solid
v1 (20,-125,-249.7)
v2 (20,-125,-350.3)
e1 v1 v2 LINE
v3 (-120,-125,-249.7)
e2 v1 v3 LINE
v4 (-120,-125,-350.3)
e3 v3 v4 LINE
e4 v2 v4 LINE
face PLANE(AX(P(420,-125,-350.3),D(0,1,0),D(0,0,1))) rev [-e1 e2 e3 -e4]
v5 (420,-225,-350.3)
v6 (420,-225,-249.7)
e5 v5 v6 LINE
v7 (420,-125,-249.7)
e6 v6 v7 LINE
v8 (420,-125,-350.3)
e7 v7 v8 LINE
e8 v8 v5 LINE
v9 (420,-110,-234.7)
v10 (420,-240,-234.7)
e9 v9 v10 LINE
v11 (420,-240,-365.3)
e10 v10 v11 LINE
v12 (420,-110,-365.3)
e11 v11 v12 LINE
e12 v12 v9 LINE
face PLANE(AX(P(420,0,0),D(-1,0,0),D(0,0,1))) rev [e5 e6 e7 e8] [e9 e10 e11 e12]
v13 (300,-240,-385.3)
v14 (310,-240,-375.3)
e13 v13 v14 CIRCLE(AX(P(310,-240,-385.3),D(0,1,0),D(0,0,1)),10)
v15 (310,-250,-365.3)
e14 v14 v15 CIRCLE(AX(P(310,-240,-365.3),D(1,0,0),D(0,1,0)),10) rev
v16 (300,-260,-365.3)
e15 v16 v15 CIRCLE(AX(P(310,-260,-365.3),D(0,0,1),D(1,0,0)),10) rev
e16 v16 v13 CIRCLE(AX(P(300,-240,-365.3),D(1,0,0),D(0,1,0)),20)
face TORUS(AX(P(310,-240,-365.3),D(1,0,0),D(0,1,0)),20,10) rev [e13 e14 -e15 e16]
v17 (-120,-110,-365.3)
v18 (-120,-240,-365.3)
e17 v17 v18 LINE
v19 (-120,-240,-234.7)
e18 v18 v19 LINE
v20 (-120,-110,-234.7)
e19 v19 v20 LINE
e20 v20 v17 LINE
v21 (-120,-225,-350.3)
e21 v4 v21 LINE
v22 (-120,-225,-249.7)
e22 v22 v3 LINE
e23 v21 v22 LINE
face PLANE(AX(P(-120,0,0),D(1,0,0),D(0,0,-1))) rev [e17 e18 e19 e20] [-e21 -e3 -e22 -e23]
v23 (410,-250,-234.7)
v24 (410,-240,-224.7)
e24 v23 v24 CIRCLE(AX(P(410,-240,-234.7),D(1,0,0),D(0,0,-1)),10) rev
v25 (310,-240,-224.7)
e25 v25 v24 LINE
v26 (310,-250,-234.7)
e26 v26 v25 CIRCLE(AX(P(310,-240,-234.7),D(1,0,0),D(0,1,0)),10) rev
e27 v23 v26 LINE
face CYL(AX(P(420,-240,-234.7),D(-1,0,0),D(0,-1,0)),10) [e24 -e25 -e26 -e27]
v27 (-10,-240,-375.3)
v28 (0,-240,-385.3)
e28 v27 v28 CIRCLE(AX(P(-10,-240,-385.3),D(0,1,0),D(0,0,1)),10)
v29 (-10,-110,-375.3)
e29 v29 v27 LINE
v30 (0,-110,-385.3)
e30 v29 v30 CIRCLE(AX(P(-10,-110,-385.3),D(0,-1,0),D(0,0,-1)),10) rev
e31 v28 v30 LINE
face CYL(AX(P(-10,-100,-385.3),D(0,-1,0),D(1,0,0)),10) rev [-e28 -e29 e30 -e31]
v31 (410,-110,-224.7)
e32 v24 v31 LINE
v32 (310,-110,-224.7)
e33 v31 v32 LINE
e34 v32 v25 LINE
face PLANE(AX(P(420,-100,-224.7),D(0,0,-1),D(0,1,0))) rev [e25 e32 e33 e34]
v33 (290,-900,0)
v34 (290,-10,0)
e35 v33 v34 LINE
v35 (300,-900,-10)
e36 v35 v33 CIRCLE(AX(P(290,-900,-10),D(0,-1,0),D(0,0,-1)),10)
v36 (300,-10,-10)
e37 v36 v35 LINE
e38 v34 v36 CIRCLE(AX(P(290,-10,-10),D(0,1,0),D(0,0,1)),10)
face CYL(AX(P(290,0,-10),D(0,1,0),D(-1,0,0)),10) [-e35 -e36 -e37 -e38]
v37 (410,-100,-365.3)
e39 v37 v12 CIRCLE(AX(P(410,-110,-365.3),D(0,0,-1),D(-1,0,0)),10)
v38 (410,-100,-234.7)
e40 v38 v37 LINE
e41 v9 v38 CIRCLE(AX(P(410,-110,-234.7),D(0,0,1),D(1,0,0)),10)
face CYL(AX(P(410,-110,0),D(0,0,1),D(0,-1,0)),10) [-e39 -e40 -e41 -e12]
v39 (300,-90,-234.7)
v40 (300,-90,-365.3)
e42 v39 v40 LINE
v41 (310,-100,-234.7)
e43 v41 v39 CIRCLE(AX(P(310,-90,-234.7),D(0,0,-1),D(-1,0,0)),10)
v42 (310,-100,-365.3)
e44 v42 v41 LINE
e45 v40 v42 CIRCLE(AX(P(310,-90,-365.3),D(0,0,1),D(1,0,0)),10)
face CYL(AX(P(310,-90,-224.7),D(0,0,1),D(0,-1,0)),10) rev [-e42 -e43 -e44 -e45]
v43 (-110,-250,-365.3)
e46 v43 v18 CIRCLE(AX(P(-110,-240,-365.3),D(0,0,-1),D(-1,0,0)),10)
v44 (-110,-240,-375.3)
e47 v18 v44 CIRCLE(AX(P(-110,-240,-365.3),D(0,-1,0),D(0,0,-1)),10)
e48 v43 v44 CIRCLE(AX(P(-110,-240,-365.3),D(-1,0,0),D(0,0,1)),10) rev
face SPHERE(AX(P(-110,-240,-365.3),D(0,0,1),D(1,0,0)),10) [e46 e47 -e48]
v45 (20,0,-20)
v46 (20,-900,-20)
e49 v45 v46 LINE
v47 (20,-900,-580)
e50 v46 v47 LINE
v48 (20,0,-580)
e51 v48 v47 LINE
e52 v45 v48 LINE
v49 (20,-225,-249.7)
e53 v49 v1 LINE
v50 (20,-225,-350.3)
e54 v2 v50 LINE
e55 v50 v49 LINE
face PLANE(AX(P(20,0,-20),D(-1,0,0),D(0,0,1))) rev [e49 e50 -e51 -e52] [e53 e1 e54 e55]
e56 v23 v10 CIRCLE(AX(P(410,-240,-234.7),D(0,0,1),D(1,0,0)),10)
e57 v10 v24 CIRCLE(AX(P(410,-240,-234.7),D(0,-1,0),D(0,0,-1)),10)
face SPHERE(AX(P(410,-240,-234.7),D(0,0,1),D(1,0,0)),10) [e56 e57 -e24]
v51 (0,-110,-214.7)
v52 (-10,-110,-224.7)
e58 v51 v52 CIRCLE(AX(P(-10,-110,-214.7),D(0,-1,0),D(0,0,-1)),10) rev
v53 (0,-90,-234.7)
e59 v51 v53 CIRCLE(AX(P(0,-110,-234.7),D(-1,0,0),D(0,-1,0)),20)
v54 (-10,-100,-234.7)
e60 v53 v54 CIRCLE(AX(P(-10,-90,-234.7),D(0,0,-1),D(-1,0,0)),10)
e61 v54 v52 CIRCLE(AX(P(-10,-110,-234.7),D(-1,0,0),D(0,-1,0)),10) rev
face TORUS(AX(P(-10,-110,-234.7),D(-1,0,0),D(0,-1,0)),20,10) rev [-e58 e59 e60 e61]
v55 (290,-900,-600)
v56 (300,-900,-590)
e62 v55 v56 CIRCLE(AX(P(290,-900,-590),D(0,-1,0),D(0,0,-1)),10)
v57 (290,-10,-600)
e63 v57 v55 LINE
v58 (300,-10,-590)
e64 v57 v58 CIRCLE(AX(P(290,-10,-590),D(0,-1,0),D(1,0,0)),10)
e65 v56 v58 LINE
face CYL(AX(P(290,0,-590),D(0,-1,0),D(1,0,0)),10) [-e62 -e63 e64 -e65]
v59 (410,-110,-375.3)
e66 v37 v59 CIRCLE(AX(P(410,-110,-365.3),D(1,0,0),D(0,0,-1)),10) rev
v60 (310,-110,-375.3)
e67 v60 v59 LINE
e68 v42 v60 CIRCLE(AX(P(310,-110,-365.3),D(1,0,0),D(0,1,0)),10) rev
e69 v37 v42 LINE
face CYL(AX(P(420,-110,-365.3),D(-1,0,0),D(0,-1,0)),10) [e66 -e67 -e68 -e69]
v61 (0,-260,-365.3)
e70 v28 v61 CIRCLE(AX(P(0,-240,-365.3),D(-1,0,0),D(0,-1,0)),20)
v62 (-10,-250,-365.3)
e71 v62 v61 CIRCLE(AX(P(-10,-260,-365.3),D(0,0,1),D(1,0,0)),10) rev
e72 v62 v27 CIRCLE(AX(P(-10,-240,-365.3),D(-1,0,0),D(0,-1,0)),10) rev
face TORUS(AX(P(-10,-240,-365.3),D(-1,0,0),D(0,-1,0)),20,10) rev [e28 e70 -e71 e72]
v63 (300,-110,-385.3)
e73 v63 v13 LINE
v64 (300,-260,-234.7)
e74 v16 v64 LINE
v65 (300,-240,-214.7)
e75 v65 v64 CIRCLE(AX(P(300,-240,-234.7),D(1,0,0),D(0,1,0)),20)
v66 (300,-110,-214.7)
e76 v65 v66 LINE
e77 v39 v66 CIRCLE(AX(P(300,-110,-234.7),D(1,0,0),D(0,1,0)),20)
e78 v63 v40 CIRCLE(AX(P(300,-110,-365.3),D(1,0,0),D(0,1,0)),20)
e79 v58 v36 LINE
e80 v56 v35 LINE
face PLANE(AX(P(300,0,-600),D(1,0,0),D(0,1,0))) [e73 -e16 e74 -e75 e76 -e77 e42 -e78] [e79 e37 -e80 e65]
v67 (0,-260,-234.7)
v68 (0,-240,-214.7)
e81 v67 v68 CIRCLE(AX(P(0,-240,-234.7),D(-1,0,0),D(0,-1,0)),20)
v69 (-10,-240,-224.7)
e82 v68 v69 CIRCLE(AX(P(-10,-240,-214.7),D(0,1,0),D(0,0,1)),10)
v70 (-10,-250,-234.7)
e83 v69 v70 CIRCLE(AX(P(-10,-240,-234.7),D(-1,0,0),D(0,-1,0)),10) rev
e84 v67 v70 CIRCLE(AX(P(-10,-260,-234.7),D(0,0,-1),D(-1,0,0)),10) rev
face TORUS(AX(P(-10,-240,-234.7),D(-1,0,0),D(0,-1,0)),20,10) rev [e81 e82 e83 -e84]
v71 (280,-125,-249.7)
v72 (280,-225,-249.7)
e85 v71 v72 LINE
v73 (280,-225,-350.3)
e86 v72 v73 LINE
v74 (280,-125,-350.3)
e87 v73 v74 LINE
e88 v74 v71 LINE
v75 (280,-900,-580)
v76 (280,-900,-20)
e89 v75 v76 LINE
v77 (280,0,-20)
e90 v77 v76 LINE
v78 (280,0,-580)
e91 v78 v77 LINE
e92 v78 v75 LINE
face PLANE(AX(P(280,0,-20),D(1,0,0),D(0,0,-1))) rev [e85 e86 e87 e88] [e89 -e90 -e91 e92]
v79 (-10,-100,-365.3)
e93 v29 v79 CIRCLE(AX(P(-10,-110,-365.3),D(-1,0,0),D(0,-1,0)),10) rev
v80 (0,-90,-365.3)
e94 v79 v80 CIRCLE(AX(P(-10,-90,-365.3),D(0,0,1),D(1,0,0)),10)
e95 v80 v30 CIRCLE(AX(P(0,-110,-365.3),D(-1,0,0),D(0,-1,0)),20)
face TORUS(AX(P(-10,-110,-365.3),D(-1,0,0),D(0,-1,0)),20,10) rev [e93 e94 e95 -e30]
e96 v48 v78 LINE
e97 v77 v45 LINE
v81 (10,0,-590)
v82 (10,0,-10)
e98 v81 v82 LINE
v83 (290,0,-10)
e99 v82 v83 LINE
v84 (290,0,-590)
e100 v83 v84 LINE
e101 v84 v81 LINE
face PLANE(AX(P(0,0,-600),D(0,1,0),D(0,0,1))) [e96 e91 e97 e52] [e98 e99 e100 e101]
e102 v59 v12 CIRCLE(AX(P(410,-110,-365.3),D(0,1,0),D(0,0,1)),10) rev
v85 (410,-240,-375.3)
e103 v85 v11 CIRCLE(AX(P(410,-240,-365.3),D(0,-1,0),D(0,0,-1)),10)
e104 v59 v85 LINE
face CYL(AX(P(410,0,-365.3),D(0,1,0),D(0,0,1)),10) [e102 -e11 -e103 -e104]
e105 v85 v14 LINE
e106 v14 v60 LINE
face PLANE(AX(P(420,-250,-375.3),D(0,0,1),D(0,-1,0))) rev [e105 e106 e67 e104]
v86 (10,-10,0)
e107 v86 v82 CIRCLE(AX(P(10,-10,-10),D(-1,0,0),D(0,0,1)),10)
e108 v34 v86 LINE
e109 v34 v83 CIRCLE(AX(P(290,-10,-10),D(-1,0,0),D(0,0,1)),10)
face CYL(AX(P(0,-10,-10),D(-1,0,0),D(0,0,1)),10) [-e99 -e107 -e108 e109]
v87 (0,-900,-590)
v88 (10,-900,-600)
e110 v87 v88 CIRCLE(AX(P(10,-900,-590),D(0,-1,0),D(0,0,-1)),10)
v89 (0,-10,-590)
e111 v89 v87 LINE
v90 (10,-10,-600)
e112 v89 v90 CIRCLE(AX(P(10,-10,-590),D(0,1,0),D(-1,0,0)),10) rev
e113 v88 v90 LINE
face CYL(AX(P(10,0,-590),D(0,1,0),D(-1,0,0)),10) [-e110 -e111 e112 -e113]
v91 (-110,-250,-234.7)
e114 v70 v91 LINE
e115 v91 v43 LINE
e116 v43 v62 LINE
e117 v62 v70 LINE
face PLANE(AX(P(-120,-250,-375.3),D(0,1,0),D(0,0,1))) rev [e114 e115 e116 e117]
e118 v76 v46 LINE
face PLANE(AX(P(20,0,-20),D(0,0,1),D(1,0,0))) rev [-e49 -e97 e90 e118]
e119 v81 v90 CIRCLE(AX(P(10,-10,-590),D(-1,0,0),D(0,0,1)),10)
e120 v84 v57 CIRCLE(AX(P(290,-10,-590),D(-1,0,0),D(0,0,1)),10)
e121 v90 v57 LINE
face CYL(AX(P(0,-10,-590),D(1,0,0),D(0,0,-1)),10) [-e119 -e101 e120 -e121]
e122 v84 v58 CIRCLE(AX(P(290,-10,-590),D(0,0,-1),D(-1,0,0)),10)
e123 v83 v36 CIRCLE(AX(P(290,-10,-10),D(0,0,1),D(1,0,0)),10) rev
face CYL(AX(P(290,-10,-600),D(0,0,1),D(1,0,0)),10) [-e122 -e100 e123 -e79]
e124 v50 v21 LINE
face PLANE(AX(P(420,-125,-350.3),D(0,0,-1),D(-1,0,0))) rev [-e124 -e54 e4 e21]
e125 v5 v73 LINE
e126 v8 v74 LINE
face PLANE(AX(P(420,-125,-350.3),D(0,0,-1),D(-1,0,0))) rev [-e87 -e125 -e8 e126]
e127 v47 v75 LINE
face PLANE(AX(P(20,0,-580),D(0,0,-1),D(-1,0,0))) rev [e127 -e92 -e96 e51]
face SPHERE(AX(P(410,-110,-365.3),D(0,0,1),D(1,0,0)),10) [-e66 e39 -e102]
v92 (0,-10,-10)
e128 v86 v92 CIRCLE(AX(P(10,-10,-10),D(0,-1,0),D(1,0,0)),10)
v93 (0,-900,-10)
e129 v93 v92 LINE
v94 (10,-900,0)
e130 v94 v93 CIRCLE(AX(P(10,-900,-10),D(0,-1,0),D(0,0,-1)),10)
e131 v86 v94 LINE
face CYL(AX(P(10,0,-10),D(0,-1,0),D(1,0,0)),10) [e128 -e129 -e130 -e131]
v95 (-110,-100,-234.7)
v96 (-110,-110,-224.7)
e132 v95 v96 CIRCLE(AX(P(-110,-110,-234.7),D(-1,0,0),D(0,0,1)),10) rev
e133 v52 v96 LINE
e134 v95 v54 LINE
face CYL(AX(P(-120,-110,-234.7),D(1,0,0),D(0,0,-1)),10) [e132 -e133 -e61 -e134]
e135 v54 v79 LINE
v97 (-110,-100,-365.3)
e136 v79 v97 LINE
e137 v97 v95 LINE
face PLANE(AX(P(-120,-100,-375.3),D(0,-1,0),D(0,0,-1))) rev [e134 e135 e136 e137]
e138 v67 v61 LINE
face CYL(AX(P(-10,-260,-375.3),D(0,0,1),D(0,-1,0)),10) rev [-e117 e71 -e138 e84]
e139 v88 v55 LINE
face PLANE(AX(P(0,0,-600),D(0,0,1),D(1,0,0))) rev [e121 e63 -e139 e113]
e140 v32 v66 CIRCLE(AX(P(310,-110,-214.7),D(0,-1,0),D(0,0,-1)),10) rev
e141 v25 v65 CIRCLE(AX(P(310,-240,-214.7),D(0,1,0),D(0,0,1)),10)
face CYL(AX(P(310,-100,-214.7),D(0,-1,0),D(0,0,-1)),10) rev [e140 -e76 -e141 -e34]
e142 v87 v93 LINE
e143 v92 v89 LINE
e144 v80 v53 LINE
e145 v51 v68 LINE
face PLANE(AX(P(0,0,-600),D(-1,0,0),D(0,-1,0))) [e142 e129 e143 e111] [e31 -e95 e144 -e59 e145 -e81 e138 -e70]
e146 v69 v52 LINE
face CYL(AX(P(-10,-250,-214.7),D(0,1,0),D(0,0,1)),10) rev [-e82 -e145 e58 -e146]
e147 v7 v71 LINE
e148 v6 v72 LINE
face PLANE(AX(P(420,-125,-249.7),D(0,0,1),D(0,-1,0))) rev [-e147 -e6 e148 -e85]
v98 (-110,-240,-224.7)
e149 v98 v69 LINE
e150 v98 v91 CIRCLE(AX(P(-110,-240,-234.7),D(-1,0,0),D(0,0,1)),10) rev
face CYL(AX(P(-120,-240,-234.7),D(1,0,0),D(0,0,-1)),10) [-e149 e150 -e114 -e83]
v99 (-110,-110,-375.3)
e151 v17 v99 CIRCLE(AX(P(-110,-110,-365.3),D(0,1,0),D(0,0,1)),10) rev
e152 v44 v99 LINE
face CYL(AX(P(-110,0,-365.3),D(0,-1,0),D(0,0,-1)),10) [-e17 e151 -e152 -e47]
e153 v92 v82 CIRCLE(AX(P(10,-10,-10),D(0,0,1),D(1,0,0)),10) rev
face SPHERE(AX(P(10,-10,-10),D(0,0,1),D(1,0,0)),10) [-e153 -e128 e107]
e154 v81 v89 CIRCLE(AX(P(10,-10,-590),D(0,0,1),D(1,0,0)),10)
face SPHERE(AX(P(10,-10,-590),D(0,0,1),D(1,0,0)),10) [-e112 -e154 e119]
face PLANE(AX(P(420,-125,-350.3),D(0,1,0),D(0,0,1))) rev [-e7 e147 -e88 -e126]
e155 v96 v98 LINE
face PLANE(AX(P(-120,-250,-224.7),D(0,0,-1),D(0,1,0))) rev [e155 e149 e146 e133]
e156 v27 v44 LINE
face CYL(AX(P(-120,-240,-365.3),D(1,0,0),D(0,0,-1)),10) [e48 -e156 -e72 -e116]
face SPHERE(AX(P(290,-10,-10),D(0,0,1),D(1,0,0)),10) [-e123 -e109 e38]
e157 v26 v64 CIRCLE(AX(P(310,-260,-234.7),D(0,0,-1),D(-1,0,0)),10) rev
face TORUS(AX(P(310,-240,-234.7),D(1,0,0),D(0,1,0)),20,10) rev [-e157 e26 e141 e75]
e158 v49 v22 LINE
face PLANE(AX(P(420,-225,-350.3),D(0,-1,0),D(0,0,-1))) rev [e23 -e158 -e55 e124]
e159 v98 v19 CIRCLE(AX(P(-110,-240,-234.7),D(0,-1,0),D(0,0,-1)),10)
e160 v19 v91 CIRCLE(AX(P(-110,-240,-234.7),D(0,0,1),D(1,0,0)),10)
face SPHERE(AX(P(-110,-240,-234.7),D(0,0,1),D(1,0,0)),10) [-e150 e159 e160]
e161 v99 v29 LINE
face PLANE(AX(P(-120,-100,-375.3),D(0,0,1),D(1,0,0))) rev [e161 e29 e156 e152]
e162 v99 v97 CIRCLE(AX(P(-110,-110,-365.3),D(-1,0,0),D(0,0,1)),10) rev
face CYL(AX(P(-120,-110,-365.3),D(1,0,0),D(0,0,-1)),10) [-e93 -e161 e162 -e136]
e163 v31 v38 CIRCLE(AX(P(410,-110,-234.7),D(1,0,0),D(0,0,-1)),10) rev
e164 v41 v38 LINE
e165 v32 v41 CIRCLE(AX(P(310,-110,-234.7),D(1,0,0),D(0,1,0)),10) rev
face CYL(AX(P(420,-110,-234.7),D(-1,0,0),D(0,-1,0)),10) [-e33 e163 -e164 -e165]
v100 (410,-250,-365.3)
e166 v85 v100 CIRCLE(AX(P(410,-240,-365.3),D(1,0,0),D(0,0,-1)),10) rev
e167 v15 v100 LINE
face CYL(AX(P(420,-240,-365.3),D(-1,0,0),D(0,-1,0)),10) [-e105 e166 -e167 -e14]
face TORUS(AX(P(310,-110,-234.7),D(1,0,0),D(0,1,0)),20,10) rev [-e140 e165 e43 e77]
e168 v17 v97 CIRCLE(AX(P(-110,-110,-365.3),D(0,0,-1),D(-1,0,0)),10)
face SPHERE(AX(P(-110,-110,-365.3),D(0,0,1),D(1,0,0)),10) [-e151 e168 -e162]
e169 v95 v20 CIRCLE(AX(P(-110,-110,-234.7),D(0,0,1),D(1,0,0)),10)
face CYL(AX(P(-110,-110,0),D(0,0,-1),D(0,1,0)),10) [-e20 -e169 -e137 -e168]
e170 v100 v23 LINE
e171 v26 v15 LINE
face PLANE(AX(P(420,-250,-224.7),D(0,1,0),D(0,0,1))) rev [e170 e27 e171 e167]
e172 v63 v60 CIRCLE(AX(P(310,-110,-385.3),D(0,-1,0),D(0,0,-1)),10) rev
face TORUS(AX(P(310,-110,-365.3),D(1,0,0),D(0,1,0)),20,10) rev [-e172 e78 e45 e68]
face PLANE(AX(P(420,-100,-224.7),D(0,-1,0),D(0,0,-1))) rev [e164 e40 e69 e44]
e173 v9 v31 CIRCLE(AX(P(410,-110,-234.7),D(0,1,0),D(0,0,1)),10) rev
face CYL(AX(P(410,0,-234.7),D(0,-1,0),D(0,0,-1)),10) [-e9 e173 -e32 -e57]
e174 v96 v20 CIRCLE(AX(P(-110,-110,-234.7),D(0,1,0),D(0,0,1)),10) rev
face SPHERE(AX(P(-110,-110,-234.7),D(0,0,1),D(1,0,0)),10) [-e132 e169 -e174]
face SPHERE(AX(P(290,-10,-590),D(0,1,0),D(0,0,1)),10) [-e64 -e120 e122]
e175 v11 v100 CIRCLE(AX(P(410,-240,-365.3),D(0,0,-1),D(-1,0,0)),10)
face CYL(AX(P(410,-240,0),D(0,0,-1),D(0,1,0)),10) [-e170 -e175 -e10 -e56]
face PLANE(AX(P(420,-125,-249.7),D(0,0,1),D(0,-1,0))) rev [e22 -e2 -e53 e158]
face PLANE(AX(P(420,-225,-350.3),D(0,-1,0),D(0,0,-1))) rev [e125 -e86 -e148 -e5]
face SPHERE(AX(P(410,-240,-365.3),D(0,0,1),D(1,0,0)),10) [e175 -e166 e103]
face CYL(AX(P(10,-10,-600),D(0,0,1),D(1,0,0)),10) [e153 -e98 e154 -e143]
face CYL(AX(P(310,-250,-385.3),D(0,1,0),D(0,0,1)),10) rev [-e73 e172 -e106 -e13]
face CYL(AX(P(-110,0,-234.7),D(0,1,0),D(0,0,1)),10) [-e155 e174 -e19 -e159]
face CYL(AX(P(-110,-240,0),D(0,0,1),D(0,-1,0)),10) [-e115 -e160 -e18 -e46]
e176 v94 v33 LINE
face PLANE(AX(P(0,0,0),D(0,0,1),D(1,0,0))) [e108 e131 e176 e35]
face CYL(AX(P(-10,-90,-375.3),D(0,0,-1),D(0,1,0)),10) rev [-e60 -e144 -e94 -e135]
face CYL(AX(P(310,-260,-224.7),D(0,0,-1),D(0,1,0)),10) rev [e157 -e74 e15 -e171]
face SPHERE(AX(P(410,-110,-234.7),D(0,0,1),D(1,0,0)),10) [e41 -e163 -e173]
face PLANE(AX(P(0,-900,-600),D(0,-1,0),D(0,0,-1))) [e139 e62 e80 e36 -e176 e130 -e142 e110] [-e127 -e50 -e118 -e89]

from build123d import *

# Parameters (mm, degrees)
SKETCH1_W           = 300
SKETCH1_H           = 900
BOSS_EXTRUDE1_DEPTH = 600
SKETCH4_W           = 150.6
SKETCH4_H           = 150
BOSS_EXTRUDE3_DEPTH = 120
SKETCH6_W           = 150.6
SKETCH6_H           = 150
BOSS_EXTRUDE4_DEPTH = 120
FILLET1_R           = 10
FILLET2_R           = 10
FILLET3_R           = 10
FILLET5_R           = 10
FILLET6_R           = 10
SKETCH8_W           = 260
SKETCH8_H           = 560
CUT_EXTRUDE1_DEPTH  = 1161.344776349
SKETCH7_W           = 100.6
SKETCH7_H           = 100
CUT_EXTRUDE2_DEPTH  = 1209.966500777


with BuildPart() as part:
    # Sketch1 → Boss-Extrude1 (new body)
    with BuildSketch(Plane.XY):
        with Locations((150, -450)):
            Rectangle(SKETCH1_W, SKETCH1_H)
    extrude(amount=-BOSS_EXTRUDE1_DEPTH)

    # Sketch4 → Boss-Extrude3 (add)
    with BuildSketch(Plane(origin=(300, 0, 0), x_dir=(0, 0, -1), z_dir=(1, 0, 0))):
        with Locations((300, -175)):
            Rectangle(SKETCH4_W, SKETCH4_H)
    extrude(amount=BOSS_EXTRUDE3_DEPTH)

    # Sketch6 → Boss-Extrude4 (add)
    with BuildSketch(Plane.ZY):
        with Locations((-300, -175)):
            Rectangle(SKETCH6_W, SKETCH6_H)
    extrude(amount=BOSS_EXTRUDE4_DEPTH)

    # Fillet1
    fillet1_edges = [part.edges().sort_by_distance(p)[0] for p in [
        (300, -450, -600),
        (0, -450, -600),
        (0, 0, -300),
    ]]
    fillet(fillet1_edges, radius=FILLET1_R)

    # Fillet2
    fillet2_edges = [part.edges().sort_by_distance(p)[0] for p in [
        (0, -175, -224.7),
        (-60, -250, -224.7),
        (0, -100, -300),
        (-60, -100, -224.7),
        (0, -175, -375.3),
        (-60, -100, -375.3),
        (0, -250, -300),
        (-60, -250, -375.3),
        (-120, -175, -224.7),
        (-120, -100, -300),
        (-120, -175, -375.3),
        (-120, -250, -300),
    ]]
    fillet(fillet2_edges, radius=FILLET2_R)

    # Fillet3
    fillet3_edges = [part.edges().sort_by_distance(p)[0] for p in [
        (300, -175, -375.3),
        (360, -250, -375.3),
        (300, -100, -300),
        (360, -100, -375.3),
        (300, -175, -224.7),
        (360, -100, -224.7),
        (300, -250, -300),
        (360, -250, -224.7),
        (420, -175, -375.3),
        (420, -100, -300),
        (420, -175, -224.7),
        (420, -250, -300),
    ]]
    fillet(fillet3_edges, radius=FILLET3_R)

    # Fillet5
    # the kernel refuses this fillet: 10 mm, written as the material it takes off along each edge
    with BuildSketch(Plane(origin=(10, -10, -590), x_dir=(0, 0, -1), z_dir=(0, 1, 0))) as fillet5_piece_1_section:
        Polygon((0, 0), (FILLET5_R, 0), (FILLET5_R, FILLET5_R), (0, FILLET5_R), align=None)
    fillet5_piece_1 = extrude(amount=FILLET5_R, mode=Mode.PRIVATE)
    fillet5_piece_1 = fillet5_piece_1 - Plane(origin=(10, -10, -590), x_dir=(0.7071067811865475, 0, 0.7071067811865475), z_dir=(0, 1, 0)) * Sphere(FILLET5_R, mode=Mode.PRIVATE)
    add(fillet5_piece_1, mode=Mode.SUBTRACT)
    with BuildSketch(Plane(origin=(300, 0, 25), x_dir=(0, -1, 0), z_dir=(0, 0, -1))) as fillet5_piece_2:
        with BuildLine():
            CenterArc((FILLET5_R, FILLET5_R), FILLET5_R, 180, 90)
            Line((0, FILLET5_R), (0, 0))
            Line((0, 0), (FILLET5_R, 0))
        make_face()
    extrude(amount=615, mode=Mode.SUBTRACT)
    with BuildSketch(Plane(origin=(10, 0, -600), x_dir=(0, 0, 1), z_dir=(1, 0, 0))) as fillet5_piece_3:
        with BuildLine():
            CenterArc((FILLET5_R, FILLET5_R), FILLET5_R, 180, 90)
            Line((0, FILLET5_R), (0, 0))
            Line((0, 0), (FILLET5_R, 0))
        make_face()
    extrude(amount=280, mode=Mode.SUBTRACT)
    with BuildSketch(Plane(origin=(290, 0, -590), x_dir=(1, 0, 0), z_dir=(0, 0, 1))) as fillet5_piece_4:
        with BuildLine():
            CenterArc((10 - FILLET5_R, -FILLET5_R), FILLET5_R, 0, 90)
            Line((10, -FILLET5_R), (10, 0))
            Line((10, 0), (10 - FILLET5_R, 0))
        make_face()
    revolve(axis=Axis((290, 0, -590), (0, 1, 0)), revolution_arc=90, mode=Mode.SUBTRACT)

    # Fillet6
    fillet6_edges = [part.edges().sort_by_distance(p)[0] for p in [
        (150, 0, 0),
        (297.071067812, -2.928932188, 0),
        (0, -455, 0),
        (2.928932188, -2.928932188, 0),
        (300, -455, 0),
    ]]
    fillet(fillet6_edges, radius=FILLET6_R)

    # Sketch8 → Cut-Extrude1 (cut, through all)
    with BuildSketch(Plane.XZ.offset(900)):
        with Locations((150, -300)):
            Rectangle(SKETCH8_W, SKETCH8_H)
    extrude(amount=-CUT_EXTRUDE1_DEPTH, mode=Mode.SUBTRACT)

    # Sketch7 → Cut-Extrude2 (cut, through all)
    with BuildSketch(Plane.ZY.offset(120)):
        with Locations((-300, -175)):
            Rectangle(SKETCH7_W, SKETCH7_H)
    extrude(amount=-CUT_EXTRUDE2_DEPTH, mode=Mode.SUBTRACT)


solid = part.part
